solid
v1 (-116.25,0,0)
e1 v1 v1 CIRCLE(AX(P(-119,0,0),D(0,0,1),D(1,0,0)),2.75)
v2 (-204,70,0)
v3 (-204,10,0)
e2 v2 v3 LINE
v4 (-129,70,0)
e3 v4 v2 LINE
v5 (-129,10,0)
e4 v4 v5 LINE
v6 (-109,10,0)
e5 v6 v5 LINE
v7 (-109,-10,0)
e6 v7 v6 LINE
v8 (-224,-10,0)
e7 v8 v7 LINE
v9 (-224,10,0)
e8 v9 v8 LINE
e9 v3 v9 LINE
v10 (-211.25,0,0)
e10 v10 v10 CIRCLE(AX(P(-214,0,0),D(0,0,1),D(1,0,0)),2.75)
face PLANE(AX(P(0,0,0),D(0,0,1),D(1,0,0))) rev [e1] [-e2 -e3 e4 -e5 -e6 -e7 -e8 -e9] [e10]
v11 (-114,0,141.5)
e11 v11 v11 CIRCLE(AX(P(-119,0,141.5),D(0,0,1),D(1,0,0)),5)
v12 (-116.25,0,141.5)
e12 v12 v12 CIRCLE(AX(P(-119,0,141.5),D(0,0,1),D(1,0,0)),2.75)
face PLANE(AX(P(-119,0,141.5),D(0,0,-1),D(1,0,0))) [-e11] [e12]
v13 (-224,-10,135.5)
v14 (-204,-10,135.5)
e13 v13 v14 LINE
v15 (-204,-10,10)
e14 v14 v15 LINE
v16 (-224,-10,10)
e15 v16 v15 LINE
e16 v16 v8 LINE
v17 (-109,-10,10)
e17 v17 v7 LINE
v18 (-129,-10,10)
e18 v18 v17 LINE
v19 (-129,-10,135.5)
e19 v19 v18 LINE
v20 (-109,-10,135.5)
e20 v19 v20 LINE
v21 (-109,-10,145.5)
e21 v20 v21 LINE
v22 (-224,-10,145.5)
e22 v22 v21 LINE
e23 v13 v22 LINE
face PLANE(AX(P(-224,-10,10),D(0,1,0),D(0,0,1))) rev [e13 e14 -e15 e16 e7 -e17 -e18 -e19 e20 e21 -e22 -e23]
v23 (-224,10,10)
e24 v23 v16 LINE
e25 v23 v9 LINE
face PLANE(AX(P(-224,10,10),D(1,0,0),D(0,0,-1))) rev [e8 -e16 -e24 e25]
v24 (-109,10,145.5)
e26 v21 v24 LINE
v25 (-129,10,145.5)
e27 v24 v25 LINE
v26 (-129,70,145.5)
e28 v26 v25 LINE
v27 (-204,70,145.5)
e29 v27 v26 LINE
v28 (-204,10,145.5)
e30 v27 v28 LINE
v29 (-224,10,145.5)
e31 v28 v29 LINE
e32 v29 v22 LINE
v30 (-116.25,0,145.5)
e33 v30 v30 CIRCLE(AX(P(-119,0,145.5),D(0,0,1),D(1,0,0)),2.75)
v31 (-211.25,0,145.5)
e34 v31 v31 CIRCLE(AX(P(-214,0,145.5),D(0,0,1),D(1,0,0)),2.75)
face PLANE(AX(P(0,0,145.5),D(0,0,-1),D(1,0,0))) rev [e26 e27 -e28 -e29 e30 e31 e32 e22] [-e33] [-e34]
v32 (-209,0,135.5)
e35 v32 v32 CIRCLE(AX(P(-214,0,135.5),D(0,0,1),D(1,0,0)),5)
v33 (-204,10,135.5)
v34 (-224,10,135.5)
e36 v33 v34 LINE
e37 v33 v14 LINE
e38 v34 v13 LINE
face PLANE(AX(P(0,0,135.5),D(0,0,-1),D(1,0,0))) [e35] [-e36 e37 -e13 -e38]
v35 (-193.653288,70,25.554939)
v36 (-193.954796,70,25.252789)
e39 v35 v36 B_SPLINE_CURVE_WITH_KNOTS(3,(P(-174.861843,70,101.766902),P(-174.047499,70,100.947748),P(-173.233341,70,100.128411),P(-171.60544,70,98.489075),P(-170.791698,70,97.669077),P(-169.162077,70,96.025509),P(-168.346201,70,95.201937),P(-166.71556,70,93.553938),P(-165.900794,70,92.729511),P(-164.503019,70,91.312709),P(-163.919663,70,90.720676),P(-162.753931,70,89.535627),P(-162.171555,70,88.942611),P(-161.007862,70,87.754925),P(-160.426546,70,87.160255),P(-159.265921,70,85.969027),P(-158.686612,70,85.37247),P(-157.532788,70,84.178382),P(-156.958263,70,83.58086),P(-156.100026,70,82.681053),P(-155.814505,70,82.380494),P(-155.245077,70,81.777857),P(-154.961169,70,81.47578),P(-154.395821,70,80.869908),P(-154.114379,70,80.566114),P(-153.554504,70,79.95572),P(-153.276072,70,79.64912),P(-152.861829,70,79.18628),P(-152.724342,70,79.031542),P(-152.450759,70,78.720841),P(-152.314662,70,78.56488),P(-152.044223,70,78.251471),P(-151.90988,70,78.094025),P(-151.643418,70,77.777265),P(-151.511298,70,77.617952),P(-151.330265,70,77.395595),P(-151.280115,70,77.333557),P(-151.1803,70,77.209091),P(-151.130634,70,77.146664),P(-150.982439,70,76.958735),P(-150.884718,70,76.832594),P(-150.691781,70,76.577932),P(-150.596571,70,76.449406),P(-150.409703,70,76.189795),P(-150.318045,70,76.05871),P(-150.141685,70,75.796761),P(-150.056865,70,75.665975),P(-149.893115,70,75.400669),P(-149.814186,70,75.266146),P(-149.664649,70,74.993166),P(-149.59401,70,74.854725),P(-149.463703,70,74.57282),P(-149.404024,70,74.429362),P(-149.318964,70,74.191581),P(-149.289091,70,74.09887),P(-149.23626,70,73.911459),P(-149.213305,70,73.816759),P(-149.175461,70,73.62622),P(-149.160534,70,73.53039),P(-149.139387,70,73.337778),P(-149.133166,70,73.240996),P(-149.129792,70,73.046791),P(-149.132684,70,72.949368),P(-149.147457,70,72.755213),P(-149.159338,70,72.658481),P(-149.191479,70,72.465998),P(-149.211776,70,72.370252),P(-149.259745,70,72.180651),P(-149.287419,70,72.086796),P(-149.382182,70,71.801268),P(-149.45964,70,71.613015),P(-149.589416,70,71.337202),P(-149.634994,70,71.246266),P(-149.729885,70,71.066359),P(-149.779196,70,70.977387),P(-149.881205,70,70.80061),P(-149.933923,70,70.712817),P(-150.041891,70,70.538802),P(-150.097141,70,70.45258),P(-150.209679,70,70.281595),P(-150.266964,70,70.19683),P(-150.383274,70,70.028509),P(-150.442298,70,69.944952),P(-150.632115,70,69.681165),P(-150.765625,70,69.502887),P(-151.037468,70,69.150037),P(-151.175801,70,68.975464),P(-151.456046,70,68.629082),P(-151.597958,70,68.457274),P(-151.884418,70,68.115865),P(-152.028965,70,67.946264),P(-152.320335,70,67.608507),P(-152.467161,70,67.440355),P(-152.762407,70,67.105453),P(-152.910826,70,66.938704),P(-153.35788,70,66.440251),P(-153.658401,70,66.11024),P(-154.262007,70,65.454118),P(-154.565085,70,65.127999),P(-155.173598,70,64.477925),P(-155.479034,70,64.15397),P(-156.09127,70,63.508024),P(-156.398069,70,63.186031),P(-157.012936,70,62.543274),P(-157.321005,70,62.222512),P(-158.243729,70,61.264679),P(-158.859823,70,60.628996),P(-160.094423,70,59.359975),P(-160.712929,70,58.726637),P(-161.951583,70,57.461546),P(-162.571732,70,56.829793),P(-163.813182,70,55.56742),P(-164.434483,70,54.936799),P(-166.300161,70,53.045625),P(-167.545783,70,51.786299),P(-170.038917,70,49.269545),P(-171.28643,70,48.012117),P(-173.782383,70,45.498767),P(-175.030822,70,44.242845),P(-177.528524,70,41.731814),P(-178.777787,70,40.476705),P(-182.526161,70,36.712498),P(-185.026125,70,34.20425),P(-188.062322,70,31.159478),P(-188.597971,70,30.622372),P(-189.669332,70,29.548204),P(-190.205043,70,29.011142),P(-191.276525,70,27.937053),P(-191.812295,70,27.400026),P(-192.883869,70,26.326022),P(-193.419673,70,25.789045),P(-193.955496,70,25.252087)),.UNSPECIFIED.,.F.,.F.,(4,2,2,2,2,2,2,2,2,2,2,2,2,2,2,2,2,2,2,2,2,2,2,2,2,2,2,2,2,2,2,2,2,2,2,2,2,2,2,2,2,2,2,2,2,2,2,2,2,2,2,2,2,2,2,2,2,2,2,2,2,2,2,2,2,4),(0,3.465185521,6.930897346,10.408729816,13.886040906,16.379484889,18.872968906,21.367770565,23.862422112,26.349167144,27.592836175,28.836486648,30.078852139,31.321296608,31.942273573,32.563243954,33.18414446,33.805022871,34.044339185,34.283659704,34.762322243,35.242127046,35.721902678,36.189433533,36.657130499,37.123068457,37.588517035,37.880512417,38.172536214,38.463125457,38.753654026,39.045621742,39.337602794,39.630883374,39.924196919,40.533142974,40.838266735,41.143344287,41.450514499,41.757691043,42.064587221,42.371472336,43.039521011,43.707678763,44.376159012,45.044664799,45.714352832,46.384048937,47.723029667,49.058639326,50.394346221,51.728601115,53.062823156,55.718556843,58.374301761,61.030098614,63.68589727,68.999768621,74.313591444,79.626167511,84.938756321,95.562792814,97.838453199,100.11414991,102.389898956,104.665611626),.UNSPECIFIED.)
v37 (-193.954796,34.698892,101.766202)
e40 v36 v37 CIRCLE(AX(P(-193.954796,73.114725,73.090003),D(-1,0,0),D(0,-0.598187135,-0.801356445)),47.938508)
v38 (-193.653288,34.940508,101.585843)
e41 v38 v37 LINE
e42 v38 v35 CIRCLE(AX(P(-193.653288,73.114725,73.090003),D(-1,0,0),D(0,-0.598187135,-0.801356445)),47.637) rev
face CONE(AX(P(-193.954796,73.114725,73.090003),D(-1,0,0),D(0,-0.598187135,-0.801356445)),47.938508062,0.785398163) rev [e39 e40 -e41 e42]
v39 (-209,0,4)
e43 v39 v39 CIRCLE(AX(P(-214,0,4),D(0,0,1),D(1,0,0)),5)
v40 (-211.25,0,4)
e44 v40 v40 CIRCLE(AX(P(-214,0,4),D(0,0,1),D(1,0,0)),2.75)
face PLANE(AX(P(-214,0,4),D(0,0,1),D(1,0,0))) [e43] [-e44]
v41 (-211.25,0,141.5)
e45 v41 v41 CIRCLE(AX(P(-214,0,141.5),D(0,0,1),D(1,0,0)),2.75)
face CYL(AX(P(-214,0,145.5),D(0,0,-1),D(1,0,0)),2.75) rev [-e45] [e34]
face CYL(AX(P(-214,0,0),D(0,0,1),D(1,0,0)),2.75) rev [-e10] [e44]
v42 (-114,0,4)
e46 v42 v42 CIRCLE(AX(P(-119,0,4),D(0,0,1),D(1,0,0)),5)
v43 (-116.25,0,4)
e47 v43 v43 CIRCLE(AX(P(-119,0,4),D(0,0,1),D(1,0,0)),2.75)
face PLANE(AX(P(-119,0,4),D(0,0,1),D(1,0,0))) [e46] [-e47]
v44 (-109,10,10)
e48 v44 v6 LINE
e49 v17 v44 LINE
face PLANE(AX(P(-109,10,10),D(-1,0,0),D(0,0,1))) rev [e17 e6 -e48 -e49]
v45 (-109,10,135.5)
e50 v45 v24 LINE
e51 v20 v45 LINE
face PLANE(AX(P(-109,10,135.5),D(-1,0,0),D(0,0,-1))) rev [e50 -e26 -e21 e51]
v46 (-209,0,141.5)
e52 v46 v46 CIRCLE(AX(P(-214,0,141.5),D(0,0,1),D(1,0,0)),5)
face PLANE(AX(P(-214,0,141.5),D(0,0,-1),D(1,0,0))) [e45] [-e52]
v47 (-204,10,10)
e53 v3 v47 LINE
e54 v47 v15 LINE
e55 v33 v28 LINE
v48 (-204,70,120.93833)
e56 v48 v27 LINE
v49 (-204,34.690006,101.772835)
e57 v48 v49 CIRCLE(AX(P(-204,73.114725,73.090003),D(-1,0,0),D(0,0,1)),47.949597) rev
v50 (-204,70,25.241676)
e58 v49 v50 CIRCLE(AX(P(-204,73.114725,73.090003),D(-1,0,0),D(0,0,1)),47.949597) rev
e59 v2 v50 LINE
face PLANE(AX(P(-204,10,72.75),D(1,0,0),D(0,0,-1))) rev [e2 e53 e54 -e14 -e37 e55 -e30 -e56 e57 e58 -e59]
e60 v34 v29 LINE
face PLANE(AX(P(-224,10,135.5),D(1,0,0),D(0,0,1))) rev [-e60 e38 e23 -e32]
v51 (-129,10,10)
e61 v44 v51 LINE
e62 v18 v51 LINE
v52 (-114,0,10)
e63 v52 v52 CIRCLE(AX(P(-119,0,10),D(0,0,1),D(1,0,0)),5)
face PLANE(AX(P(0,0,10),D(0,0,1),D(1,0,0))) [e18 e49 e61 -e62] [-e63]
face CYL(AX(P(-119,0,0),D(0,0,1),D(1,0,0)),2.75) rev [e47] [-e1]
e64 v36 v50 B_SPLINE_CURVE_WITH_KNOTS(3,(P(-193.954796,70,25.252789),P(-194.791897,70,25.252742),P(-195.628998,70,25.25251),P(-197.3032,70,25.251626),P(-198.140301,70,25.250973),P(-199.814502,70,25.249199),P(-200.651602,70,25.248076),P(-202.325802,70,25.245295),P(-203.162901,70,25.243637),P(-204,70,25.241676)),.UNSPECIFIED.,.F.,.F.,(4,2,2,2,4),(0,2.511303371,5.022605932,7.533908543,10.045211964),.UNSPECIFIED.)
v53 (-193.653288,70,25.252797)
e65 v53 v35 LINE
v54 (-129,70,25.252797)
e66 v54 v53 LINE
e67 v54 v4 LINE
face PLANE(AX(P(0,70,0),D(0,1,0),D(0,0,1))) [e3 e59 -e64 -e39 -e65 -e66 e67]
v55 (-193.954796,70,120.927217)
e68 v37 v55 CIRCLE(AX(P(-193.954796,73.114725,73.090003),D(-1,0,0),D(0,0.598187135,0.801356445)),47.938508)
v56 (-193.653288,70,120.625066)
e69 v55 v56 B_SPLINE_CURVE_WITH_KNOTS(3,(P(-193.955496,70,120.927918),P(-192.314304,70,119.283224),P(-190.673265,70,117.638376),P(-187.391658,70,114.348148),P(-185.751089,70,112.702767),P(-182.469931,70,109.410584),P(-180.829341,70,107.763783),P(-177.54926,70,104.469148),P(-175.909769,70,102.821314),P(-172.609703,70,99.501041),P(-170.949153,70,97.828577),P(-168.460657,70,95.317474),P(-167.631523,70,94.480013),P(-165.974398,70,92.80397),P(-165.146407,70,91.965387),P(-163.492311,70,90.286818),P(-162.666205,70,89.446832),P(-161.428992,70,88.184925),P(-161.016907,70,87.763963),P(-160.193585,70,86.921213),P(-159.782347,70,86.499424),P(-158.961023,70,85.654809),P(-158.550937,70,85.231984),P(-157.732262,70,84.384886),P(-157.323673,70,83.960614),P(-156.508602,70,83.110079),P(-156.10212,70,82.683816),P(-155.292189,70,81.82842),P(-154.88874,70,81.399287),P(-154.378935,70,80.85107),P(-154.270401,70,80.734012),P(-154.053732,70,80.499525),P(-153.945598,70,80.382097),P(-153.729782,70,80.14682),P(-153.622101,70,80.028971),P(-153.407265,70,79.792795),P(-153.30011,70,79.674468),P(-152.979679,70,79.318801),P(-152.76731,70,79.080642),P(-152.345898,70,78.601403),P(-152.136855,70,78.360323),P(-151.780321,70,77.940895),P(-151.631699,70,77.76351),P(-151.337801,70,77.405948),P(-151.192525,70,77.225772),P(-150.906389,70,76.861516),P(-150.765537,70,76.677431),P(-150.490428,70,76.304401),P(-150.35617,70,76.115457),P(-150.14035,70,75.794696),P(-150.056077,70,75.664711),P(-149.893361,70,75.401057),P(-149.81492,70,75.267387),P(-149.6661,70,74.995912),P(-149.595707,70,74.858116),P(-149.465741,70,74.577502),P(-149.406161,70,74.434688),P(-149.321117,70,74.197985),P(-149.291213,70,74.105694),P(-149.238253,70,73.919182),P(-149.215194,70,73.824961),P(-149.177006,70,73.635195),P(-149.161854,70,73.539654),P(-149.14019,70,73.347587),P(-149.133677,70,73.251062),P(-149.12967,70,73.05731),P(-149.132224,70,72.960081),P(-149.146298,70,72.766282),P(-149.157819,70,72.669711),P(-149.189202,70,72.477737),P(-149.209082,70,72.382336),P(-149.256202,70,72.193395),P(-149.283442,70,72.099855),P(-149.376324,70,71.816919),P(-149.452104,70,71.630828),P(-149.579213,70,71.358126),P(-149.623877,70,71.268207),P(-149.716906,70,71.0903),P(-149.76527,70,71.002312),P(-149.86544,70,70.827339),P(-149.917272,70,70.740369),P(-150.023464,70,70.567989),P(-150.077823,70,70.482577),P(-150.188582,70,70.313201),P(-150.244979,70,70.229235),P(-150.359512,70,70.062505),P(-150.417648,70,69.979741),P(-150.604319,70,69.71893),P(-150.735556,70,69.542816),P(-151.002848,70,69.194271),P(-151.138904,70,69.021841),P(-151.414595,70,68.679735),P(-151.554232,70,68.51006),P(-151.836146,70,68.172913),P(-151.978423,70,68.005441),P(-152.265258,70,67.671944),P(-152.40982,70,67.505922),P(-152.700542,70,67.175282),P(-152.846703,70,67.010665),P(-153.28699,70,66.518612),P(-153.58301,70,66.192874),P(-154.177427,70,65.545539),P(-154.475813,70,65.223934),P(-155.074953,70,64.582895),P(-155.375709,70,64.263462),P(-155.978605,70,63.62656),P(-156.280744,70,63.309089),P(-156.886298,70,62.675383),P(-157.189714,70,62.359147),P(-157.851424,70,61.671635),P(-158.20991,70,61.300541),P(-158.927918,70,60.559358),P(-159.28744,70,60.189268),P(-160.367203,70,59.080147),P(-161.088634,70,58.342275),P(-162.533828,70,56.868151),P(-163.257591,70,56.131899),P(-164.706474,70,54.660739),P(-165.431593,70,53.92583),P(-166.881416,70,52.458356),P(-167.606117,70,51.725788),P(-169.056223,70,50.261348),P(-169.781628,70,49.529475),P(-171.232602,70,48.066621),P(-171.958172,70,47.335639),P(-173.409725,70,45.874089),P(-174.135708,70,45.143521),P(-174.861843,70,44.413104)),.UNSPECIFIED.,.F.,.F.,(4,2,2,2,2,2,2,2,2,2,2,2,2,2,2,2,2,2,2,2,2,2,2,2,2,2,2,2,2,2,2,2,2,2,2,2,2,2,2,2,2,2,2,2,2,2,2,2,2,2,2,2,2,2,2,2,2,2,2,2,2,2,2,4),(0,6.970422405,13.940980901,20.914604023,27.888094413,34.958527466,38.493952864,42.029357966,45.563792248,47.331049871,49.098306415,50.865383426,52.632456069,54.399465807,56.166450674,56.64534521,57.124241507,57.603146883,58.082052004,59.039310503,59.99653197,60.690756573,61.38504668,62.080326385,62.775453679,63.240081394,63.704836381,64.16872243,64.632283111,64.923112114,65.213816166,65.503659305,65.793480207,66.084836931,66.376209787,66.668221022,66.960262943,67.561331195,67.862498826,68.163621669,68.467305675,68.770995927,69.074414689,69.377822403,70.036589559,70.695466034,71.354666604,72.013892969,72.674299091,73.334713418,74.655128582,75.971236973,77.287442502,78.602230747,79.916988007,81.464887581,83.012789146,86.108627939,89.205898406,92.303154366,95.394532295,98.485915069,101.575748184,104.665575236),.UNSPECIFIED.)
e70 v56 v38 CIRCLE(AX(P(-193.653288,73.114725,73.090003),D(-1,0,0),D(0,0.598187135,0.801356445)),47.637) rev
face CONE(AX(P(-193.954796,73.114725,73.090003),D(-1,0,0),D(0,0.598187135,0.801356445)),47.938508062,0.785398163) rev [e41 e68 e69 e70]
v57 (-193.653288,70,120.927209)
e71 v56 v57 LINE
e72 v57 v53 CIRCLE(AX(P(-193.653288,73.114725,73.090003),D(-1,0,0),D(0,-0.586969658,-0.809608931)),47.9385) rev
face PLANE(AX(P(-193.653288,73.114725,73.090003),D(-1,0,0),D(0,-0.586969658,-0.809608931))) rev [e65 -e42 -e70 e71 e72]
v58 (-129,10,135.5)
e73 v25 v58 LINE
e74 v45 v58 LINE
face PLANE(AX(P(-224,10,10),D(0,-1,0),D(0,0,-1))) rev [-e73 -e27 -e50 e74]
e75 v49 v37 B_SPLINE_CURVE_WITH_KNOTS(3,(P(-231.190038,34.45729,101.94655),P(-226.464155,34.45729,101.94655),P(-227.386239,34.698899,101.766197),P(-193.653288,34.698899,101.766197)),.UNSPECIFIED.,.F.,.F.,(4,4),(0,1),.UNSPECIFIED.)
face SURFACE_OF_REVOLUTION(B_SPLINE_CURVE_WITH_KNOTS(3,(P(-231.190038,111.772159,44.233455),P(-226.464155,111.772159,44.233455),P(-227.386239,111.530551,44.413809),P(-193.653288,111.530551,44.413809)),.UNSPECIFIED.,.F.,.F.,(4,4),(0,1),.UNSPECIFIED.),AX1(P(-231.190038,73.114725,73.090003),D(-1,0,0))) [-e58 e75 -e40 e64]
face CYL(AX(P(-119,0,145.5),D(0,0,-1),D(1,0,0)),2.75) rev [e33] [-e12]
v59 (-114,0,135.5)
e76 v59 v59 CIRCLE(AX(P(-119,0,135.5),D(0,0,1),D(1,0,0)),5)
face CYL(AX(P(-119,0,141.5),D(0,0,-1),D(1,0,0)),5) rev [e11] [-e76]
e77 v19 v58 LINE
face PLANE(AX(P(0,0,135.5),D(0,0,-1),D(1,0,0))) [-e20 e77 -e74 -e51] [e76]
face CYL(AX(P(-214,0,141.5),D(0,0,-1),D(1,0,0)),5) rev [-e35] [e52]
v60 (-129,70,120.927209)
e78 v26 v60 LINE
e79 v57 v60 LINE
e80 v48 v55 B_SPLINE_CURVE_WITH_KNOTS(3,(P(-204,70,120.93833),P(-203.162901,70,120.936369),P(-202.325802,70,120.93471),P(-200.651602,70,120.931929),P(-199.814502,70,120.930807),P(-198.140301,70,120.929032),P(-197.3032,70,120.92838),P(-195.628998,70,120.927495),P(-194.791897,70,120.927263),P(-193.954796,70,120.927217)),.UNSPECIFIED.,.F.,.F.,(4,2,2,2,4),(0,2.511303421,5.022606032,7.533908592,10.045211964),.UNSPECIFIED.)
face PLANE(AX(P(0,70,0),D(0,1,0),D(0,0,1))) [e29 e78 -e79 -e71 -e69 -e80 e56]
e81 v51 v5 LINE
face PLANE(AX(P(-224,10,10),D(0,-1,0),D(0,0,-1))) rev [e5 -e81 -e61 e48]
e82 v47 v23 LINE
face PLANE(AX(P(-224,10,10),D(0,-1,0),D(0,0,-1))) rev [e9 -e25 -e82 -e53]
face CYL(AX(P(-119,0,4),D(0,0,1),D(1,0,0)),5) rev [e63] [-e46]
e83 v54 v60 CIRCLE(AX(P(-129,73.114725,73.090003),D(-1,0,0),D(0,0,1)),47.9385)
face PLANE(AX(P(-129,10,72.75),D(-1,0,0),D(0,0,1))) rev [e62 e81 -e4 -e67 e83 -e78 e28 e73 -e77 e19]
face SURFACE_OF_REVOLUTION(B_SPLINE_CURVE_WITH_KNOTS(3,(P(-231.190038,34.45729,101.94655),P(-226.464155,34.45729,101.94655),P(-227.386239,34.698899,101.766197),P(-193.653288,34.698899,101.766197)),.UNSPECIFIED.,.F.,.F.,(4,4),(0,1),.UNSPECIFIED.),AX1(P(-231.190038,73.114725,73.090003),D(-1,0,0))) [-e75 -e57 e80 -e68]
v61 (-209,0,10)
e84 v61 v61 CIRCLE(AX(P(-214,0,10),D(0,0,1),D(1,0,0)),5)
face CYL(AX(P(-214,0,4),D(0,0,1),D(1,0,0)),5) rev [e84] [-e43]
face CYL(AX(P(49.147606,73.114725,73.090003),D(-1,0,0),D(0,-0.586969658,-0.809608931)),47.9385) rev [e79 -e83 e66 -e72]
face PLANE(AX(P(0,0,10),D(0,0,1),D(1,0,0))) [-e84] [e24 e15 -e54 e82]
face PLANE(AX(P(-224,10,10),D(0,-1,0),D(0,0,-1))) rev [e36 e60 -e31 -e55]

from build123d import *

# Parameters (mm, degrees)
SKETCH1_W           = 115
SKETCH1_H           = 20
BOSS_EXTRUDE2_DEPTH = 10
SKETCH5_W           = 75
SKETCH5_H           = 20
BOSS_EXTRUDE3_DEPTH = 62.75
SKETCH6_R           = 5
CUT_EXTRUDE1_DEPTH  = 6
SKETCH7_R           = 2.75
CUT_EXTRUDE2_DEPTH  = 233.838060677
SKETCH8_W           = 75
SKETCH8_H           = 145.5
BOSS_EXTRUDE4_DEPTH = 60


# Read off the part's stored shape, not the designer's step: Cavity1
with BuildPart() as part:
    # Sketch1 → Boss-Extrude2 (new body)
    with BuildSketch(Plane.XY):
        with Locations((-166.5, 0)):
            Rectangle(SKETCH1_W, SKETCH1_H)
    boss_extrude2 = extrude(amount=BOSS_EXTRUDE2_DEPTH)

    # Sketch5 → Boss-Extrude3 (add)
    with BuildSketch(Plane.XY.offset(10)):
        with Locations((-166.5, 0)):
            Rectangle(SKETCH5_W, SKETCH5_H)
    boss_extrude3 = extrude(amount=BOSS_EXTRUDE3_DEPTH)

    # Sketch6 → Cut-Extrude1 (cut)
    with BuildSketch(Plane.XY.offset(10)):
        with Locations((-214, 0)):
            Circle(SKETCH6_R)
        with Locations((-119, 0)):
            Circle(SKETCH6_R)
    cut_extrude1 = extrude(amount=-CUT_EXTRUDE1_DEPTH, mode=Mode.SUBTRACT)

    # Sketch7 → Cut-Extrude2 (cut, through all)
    with BuildSketch(Plane.XY.offset(10)):
        with Locations((-214, 0)):
            Circle(SKETCH7_R)
        with Locations((-119, 0)):
            Circle(SKETCH7_R)
    cut_extrude2 = extrude(amount=-CUT_EXTRUDE2_DEPTH, mode=Mode.SUBTRACT)

    # Mirror2: Boss-Extrude2, Boss-Extrude3, Cut-Extrude1, Cut-Extrude2 across plane
    add(boss_extrude2.mirror(Plane.XY.offset(72.75)))
    add(boss_extrude3.mirror(Plane.XY.offset(72.75)))
    add(cut_extrude1.mirror(Plane.XY.offset(72.75)), mode=Mode.SUBTRACT)
    add(cut_extrude2.mirror(Plane.XY.offset(72.75)), mode=Mode.SUBTRACT)

    # Sketch8 → Boss-Extrude4 (add)
    with BuildSketch(Plane(origin=(0, 10, 0), x_dir=(1, 0, 0), z_dir=(0, 1, 0))):
        with Locations((-166.5, -72.75)):
            Rectangle(SKETCH8_W, SKETCH8_H)
    extrude(amount=BOSS_EXTRUDE4_DEPTH)

    # Cavity1 outline → Cavity1 (revolve, cut)
    with BuildSketch(Plane(origin=(0, 73.114724575, 73.090002845), x_dir=(0, 1, 0), z_dir=(0, 0, -1))):
        with BuildLine():
            add(Edge.make_bspline(
                [(47.94959748, -204), (47.942690938, -201.049048949), (47.938709825, -197.719672316), (47.938508062, -193.954796221)],
                knots=[0.884714855, 0.884714855, 0.884714855, 0.884714855, 0.997011473, 0.997011473, 0.997011473, 0.997011473], degree=3))
            Line((47.938508062, -193.954796221), (47.637, -193.653288159))
            Line((47.637, -193.653288159), (47.9385, -193.653288159))
            Line((47.9385, -193.653288159), (47.9385, -129))
            Line((47.9385, -129), (0, -129))
            Line((0, -129), (0, -204.0000001))
            Line((0, -204.0000001), (47.94959748, -204))
        make_face()
    revolve(axis=Axis((0, 73.114724575, 73.090002845), (1, 0, 0)), mode=Mode.SUBTRACT)


solid = part.part
